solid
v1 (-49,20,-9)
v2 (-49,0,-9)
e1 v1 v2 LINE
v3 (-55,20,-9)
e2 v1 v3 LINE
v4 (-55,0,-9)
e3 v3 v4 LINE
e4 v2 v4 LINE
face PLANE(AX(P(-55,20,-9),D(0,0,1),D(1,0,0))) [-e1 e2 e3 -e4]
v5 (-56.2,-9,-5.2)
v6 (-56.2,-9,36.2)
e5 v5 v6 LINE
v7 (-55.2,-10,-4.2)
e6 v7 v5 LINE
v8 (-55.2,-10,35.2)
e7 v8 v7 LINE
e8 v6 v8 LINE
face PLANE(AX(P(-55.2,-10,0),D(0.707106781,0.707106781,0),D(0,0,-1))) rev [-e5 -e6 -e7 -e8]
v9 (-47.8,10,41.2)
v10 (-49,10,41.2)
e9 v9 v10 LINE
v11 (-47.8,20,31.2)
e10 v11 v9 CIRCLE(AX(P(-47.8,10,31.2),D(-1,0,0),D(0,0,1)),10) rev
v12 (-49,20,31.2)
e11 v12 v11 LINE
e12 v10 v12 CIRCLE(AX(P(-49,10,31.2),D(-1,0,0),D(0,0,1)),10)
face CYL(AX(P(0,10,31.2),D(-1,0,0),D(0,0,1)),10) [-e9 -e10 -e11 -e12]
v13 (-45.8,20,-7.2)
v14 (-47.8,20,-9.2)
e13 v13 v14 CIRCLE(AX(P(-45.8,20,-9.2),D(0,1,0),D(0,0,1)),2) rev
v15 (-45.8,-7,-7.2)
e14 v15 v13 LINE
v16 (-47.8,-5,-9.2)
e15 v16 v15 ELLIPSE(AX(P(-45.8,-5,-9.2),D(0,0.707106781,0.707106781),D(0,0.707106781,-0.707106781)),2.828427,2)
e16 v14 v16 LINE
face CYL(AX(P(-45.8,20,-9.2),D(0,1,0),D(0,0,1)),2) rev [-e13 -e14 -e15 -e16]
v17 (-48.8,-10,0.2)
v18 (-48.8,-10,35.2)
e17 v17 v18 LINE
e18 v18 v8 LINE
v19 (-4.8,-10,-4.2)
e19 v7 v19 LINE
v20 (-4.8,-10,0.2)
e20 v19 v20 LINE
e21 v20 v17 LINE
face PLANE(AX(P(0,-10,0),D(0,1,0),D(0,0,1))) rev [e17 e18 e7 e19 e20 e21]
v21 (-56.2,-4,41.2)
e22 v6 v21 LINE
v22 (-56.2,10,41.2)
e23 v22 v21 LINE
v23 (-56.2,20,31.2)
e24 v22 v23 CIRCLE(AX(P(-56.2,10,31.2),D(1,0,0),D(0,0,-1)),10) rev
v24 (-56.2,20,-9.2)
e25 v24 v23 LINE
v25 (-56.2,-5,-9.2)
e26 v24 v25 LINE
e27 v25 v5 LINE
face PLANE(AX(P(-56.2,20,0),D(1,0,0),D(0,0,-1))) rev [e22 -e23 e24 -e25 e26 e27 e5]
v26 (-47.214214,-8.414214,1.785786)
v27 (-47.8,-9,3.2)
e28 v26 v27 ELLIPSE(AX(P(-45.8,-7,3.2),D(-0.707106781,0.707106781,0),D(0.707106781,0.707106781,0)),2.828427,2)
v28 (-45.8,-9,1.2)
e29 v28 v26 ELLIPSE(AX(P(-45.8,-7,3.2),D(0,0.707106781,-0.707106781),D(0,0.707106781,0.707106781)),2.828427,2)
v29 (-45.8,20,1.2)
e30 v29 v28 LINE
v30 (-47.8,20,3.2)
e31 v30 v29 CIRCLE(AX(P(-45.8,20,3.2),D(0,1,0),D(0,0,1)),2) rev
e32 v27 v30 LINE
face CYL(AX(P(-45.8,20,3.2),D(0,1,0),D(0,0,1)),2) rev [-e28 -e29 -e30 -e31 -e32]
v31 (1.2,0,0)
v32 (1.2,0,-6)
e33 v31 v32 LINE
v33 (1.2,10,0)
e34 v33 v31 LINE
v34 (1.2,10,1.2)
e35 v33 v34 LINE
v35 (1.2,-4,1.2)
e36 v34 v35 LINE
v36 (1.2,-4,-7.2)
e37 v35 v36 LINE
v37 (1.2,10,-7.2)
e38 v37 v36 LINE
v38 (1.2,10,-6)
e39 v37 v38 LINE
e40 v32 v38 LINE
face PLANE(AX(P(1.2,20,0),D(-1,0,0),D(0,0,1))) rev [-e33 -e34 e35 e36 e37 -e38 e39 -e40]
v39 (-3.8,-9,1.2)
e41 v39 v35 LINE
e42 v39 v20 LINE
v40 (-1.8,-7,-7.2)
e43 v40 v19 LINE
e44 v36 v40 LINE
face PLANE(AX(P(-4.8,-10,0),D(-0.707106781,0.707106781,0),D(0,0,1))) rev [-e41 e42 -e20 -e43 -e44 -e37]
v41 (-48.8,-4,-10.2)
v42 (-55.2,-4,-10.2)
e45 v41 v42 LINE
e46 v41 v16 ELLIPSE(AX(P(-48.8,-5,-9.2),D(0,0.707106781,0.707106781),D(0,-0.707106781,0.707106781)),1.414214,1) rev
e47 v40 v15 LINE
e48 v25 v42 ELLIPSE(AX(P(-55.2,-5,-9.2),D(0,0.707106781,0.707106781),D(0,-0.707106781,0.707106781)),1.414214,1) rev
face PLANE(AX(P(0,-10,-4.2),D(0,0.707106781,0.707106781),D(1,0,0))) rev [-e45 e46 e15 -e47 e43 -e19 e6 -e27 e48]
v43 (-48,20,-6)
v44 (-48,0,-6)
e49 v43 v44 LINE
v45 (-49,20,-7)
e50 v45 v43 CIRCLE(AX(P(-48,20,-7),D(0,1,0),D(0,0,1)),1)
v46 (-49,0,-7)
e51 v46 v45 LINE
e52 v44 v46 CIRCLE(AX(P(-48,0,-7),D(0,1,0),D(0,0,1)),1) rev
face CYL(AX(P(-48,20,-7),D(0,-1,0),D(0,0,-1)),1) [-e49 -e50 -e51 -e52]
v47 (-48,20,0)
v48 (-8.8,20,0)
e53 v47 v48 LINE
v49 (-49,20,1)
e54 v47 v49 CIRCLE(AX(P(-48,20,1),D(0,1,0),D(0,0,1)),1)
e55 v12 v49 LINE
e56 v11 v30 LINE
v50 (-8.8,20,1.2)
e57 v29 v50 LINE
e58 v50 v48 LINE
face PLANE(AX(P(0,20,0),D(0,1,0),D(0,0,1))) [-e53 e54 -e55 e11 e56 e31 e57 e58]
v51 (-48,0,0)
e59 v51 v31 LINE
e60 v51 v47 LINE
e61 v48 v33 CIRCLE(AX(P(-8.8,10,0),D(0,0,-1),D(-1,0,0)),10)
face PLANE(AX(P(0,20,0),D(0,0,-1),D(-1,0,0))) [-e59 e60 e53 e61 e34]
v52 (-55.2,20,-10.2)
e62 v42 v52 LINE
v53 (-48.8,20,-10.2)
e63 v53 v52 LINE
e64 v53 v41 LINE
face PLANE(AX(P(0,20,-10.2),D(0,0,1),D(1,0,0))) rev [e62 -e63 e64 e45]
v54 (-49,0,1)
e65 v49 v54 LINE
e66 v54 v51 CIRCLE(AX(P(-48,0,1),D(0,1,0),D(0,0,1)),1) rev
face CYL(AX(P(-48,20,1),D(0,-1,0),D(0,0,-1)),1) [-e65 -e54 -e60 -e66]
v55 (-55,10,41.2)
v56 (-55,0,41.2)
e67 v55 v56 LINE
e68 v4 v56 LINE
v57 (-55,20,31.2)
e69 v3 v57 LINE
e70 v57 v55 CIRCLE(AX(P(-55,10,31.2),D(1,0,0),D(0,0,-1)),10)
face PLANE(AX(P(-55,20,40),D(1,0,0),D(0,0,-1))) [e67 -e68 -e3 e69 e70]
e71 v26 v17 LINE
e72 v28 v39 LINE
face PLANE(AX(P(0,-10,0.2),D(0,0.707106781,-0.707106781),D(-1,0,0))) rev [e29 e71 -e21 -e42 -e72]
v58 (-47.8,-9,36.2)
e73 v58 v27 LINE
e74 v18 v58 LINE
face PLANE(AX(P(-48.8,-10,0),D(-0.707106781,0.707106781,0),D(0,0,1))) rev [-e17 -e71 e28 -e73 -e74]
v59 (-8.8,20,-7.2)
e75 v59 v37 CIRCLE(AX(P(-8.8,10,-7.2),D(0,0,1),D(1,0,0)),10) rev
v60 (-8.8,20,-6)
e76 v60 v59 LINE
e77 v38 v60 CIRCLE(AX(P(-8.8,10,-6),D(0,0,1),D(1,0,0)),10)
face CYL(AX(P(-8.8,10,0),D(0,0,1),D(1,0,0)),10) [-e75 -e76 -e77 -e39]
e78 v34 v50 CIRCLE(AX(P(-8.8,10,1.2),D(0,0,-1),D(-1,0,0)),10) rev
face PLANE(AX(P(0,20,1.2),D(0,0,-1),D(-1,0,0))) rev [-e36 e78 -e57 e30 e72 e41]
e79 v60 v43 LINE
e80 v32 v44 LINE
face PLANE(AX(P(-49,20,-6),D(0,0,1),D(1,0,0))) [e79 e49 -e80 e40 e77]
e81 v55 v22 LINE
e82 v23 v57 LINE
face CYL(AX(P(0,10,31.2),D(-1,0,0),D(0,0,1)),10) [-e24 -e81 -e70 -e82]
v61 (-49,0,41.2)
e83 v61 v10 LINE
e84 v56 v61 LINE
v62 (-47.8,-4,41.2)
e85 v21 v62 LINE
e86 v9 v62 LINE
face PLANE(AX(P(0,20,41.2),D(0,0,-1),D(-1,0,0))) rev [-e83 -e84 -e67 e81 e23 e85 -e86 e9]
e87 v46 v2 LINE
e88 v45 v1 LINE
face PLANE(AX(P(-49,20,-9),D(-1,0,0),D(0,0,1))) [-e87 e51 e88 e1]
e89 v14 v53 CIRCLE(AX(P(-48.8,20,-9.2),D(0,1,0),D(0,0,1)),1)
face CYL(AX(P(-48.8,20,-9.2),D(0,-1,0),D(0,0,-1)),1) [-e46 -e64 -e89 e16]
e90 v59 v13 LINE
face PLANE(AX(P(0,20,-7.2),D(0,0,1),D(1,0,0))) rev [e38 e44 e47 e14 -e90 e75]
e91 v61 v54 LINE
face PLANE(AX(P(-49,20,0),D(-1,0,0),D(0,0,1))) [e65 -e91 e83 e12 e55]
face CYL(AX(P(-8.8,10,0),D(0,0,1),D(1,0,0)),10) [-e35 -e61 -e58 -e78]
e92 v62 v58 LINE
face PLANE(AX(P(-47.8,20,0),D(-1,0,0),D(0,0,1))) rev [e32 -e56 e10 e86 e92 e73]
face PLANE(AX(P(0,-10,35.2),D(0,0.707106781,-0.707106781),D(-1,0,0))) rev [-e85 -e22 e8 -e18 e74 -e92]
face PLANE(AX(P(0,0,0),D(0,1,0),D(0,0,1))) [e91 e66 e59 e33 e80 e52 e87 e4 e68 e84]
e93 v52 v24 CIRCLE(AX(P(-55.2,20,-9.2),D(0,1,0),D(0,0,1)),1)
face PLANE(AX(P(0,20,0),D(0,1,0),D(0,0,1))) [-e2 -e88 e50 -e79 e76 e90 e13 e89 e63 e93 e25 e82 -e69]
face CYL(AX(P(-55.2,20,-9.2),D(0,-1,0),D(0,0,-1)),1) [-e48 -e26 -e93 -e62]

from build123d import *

# Parameters (mm, degrees)
EXTRUDE_1_DEPTH     = 20
EXTRUDE_1_2_DEPTH   = 10
CHAMFER_1_SIZE      = 6
CHAMFER_2_SIZE      = 1
CUT_EXTRUDE_1_REACH = 74.497
SKETCH_3_W          = 6
SKETCH_3_H          = 20
CUT_EXTRUDE_2_REACH = 79.965
SKETCH_4_W          = 6
SKETCH_4_H          = 20
FILLET_1_R          = 10
FILLET_2_R          = 2
FILLET_3_R          = 1


with BuildPart() as part:
    # Эскиз1 → Extrude 1 (new body)
    with BuildSketch(Plane(origin=(0, 0, 0), x_dir=(1, 0, 0), z_dir=(0, 1, 0))):
        Polygon((1.2, -1.2), (-47.8, -1.2), (-47.8, -41.2), (-56.2, -41.2), (-56.2, 10.2), (-47.8, 10.2), (-47.8, 7.2), (1.2, 7.2), align=None)
        Polygon((0, 0), (-49, 0), (-49, -40), (-55, -40), (-55, 9), (-49, 9), (-49, 6), (0, 6), align=None, mode=Mode.SUBTRACT)
    extrude(amount=EXTRUDE_1_DEPTH)

    # Эскиз2 → Extrude 1 2 (add)
    with BuildSketch(Plane.XZ):
        Polygon((-56.2, 41.2), (-47.8, 41.2), (-47.8, 1.2), (1.2, 1.2), (1.2, -7.2), (-47.8, -7.2), (-47.8, -10.2), (-56.2, -10.2), align=None)
    extrude(amount=EXTRUDE_1_2_DEPTH)

    # Фаска1
    chamfer_1_edges = [part.edges().sort_by_distance(p)[0] for p in [
        (1.2, -10, -3),
    ]]
    chamfer(chamfer_1_edges, length=CHAMFER_1_SIZE)
    chamfer_1_2_edges = [part.edges().sort_by_distance(p)[0] for p in [
        (-52, -10, -10.2),
    ]]
    chamfer(chamfer_1_2_edges, length=CHAMFER_1_SIZE)
    chamfer_1_3_edges = [part.edges().sort_by_distance(p)[0] for p in [
        (-52, -10, 41.2),
    ]]
    chamfer(chamfer_1_3_edges, length=CHAMFER_1_SIZE)

    # Фаска2
    chamfer_2_edges = [part.edges().sort_by_distance(p)[0] for p in [
        (-47.8, -10, 18.2),
        (-56.2, -10, 15.5),
        (-26.3, -10, 1.2),
    ]]
    chamfer(chamfer_2_edges, length=CHAMFER_2_SIZE)

    # Эскиз3 → Вырез-Вытянуть1 (cut, up to next)
    with BuildSketch(Plane.ZY, mode=Mode.PRIVATE) as cut_extrude_1_sk1:
        with Locations((-3, 10)):
            Rectangle(SKETCH_3_W, SKETCH_3_H)
    cut_extrude_1_tool1 = extrude(cut_extrude_1_sk1.sketch, amount=-CUT_EXTRUDE_1_REACH, mode=Mode.PRIVATE) & part.part
    add(cut_extrude_1_tool1.solids().sort_by_distance((0, 10, -3))[0], mode=Mode.SUBTRACT)

    # Эскиз4 → Вырез-Вытянуть2 (cut, up to next)
    with BuildSketch(Plane(origin=(0, 0, 40), x_dir=(-1, 0, 0), z_dir=(0, 0, -1)), mode=Mode.PRIVATE) as cut_extrude_2_sk1:
        with Locations((52, 10)):
            Rectangle(SKETCH_4_W, SKETCH_4_H)
    cut_extrude_2_tool1 = extrude(cut_extrude_2_sk1.sketch, amount=-CUT_EXTRUDE_2_REACH, mode=Mode.PRIVATE) & part.part
    add(cut_extrude_2_tool1.solids().sort_by_distance((-52, 10, 40))[0], mode=Mode.SUBTRACT)

    # Скругление1
    fillet_1_edges = [part.edges().sort_by_distance(p)[0] for p in [
        (1.2, 20, -6.6),
        (-48.4, 20, 41.2),
        (-55.6, 20, 41.2),
        (1.2, 20, 0.6),
    ]]
    fillet(fillet_1_edges, radius=FILLET_1_R)

    # Скругление2
    fillet_2_edges = [part.edges().sort_by_distance(p)[0] for p in [
        (-47.8, 5.5, 1.2),
        (-47.8, 6.5, -7.2),
    ]]
    fillet(fillet_2_edges, radius=FILLET_2_R)

    # Скругление3
    fillet_3_edges = [part.edges().sort_by_distance(p)[0] for p in [
        (-56.2, 8, -10.2),
        (-47.8, 8, -10.2),
        (-49, 10, -6),
        (-49, 10, 0),
    ]]
    fillet(fillet_3_edges, radius=FILLET_3_R - 0.0001)  # a hair under: the kernel refuses the full size


solid = part.part
